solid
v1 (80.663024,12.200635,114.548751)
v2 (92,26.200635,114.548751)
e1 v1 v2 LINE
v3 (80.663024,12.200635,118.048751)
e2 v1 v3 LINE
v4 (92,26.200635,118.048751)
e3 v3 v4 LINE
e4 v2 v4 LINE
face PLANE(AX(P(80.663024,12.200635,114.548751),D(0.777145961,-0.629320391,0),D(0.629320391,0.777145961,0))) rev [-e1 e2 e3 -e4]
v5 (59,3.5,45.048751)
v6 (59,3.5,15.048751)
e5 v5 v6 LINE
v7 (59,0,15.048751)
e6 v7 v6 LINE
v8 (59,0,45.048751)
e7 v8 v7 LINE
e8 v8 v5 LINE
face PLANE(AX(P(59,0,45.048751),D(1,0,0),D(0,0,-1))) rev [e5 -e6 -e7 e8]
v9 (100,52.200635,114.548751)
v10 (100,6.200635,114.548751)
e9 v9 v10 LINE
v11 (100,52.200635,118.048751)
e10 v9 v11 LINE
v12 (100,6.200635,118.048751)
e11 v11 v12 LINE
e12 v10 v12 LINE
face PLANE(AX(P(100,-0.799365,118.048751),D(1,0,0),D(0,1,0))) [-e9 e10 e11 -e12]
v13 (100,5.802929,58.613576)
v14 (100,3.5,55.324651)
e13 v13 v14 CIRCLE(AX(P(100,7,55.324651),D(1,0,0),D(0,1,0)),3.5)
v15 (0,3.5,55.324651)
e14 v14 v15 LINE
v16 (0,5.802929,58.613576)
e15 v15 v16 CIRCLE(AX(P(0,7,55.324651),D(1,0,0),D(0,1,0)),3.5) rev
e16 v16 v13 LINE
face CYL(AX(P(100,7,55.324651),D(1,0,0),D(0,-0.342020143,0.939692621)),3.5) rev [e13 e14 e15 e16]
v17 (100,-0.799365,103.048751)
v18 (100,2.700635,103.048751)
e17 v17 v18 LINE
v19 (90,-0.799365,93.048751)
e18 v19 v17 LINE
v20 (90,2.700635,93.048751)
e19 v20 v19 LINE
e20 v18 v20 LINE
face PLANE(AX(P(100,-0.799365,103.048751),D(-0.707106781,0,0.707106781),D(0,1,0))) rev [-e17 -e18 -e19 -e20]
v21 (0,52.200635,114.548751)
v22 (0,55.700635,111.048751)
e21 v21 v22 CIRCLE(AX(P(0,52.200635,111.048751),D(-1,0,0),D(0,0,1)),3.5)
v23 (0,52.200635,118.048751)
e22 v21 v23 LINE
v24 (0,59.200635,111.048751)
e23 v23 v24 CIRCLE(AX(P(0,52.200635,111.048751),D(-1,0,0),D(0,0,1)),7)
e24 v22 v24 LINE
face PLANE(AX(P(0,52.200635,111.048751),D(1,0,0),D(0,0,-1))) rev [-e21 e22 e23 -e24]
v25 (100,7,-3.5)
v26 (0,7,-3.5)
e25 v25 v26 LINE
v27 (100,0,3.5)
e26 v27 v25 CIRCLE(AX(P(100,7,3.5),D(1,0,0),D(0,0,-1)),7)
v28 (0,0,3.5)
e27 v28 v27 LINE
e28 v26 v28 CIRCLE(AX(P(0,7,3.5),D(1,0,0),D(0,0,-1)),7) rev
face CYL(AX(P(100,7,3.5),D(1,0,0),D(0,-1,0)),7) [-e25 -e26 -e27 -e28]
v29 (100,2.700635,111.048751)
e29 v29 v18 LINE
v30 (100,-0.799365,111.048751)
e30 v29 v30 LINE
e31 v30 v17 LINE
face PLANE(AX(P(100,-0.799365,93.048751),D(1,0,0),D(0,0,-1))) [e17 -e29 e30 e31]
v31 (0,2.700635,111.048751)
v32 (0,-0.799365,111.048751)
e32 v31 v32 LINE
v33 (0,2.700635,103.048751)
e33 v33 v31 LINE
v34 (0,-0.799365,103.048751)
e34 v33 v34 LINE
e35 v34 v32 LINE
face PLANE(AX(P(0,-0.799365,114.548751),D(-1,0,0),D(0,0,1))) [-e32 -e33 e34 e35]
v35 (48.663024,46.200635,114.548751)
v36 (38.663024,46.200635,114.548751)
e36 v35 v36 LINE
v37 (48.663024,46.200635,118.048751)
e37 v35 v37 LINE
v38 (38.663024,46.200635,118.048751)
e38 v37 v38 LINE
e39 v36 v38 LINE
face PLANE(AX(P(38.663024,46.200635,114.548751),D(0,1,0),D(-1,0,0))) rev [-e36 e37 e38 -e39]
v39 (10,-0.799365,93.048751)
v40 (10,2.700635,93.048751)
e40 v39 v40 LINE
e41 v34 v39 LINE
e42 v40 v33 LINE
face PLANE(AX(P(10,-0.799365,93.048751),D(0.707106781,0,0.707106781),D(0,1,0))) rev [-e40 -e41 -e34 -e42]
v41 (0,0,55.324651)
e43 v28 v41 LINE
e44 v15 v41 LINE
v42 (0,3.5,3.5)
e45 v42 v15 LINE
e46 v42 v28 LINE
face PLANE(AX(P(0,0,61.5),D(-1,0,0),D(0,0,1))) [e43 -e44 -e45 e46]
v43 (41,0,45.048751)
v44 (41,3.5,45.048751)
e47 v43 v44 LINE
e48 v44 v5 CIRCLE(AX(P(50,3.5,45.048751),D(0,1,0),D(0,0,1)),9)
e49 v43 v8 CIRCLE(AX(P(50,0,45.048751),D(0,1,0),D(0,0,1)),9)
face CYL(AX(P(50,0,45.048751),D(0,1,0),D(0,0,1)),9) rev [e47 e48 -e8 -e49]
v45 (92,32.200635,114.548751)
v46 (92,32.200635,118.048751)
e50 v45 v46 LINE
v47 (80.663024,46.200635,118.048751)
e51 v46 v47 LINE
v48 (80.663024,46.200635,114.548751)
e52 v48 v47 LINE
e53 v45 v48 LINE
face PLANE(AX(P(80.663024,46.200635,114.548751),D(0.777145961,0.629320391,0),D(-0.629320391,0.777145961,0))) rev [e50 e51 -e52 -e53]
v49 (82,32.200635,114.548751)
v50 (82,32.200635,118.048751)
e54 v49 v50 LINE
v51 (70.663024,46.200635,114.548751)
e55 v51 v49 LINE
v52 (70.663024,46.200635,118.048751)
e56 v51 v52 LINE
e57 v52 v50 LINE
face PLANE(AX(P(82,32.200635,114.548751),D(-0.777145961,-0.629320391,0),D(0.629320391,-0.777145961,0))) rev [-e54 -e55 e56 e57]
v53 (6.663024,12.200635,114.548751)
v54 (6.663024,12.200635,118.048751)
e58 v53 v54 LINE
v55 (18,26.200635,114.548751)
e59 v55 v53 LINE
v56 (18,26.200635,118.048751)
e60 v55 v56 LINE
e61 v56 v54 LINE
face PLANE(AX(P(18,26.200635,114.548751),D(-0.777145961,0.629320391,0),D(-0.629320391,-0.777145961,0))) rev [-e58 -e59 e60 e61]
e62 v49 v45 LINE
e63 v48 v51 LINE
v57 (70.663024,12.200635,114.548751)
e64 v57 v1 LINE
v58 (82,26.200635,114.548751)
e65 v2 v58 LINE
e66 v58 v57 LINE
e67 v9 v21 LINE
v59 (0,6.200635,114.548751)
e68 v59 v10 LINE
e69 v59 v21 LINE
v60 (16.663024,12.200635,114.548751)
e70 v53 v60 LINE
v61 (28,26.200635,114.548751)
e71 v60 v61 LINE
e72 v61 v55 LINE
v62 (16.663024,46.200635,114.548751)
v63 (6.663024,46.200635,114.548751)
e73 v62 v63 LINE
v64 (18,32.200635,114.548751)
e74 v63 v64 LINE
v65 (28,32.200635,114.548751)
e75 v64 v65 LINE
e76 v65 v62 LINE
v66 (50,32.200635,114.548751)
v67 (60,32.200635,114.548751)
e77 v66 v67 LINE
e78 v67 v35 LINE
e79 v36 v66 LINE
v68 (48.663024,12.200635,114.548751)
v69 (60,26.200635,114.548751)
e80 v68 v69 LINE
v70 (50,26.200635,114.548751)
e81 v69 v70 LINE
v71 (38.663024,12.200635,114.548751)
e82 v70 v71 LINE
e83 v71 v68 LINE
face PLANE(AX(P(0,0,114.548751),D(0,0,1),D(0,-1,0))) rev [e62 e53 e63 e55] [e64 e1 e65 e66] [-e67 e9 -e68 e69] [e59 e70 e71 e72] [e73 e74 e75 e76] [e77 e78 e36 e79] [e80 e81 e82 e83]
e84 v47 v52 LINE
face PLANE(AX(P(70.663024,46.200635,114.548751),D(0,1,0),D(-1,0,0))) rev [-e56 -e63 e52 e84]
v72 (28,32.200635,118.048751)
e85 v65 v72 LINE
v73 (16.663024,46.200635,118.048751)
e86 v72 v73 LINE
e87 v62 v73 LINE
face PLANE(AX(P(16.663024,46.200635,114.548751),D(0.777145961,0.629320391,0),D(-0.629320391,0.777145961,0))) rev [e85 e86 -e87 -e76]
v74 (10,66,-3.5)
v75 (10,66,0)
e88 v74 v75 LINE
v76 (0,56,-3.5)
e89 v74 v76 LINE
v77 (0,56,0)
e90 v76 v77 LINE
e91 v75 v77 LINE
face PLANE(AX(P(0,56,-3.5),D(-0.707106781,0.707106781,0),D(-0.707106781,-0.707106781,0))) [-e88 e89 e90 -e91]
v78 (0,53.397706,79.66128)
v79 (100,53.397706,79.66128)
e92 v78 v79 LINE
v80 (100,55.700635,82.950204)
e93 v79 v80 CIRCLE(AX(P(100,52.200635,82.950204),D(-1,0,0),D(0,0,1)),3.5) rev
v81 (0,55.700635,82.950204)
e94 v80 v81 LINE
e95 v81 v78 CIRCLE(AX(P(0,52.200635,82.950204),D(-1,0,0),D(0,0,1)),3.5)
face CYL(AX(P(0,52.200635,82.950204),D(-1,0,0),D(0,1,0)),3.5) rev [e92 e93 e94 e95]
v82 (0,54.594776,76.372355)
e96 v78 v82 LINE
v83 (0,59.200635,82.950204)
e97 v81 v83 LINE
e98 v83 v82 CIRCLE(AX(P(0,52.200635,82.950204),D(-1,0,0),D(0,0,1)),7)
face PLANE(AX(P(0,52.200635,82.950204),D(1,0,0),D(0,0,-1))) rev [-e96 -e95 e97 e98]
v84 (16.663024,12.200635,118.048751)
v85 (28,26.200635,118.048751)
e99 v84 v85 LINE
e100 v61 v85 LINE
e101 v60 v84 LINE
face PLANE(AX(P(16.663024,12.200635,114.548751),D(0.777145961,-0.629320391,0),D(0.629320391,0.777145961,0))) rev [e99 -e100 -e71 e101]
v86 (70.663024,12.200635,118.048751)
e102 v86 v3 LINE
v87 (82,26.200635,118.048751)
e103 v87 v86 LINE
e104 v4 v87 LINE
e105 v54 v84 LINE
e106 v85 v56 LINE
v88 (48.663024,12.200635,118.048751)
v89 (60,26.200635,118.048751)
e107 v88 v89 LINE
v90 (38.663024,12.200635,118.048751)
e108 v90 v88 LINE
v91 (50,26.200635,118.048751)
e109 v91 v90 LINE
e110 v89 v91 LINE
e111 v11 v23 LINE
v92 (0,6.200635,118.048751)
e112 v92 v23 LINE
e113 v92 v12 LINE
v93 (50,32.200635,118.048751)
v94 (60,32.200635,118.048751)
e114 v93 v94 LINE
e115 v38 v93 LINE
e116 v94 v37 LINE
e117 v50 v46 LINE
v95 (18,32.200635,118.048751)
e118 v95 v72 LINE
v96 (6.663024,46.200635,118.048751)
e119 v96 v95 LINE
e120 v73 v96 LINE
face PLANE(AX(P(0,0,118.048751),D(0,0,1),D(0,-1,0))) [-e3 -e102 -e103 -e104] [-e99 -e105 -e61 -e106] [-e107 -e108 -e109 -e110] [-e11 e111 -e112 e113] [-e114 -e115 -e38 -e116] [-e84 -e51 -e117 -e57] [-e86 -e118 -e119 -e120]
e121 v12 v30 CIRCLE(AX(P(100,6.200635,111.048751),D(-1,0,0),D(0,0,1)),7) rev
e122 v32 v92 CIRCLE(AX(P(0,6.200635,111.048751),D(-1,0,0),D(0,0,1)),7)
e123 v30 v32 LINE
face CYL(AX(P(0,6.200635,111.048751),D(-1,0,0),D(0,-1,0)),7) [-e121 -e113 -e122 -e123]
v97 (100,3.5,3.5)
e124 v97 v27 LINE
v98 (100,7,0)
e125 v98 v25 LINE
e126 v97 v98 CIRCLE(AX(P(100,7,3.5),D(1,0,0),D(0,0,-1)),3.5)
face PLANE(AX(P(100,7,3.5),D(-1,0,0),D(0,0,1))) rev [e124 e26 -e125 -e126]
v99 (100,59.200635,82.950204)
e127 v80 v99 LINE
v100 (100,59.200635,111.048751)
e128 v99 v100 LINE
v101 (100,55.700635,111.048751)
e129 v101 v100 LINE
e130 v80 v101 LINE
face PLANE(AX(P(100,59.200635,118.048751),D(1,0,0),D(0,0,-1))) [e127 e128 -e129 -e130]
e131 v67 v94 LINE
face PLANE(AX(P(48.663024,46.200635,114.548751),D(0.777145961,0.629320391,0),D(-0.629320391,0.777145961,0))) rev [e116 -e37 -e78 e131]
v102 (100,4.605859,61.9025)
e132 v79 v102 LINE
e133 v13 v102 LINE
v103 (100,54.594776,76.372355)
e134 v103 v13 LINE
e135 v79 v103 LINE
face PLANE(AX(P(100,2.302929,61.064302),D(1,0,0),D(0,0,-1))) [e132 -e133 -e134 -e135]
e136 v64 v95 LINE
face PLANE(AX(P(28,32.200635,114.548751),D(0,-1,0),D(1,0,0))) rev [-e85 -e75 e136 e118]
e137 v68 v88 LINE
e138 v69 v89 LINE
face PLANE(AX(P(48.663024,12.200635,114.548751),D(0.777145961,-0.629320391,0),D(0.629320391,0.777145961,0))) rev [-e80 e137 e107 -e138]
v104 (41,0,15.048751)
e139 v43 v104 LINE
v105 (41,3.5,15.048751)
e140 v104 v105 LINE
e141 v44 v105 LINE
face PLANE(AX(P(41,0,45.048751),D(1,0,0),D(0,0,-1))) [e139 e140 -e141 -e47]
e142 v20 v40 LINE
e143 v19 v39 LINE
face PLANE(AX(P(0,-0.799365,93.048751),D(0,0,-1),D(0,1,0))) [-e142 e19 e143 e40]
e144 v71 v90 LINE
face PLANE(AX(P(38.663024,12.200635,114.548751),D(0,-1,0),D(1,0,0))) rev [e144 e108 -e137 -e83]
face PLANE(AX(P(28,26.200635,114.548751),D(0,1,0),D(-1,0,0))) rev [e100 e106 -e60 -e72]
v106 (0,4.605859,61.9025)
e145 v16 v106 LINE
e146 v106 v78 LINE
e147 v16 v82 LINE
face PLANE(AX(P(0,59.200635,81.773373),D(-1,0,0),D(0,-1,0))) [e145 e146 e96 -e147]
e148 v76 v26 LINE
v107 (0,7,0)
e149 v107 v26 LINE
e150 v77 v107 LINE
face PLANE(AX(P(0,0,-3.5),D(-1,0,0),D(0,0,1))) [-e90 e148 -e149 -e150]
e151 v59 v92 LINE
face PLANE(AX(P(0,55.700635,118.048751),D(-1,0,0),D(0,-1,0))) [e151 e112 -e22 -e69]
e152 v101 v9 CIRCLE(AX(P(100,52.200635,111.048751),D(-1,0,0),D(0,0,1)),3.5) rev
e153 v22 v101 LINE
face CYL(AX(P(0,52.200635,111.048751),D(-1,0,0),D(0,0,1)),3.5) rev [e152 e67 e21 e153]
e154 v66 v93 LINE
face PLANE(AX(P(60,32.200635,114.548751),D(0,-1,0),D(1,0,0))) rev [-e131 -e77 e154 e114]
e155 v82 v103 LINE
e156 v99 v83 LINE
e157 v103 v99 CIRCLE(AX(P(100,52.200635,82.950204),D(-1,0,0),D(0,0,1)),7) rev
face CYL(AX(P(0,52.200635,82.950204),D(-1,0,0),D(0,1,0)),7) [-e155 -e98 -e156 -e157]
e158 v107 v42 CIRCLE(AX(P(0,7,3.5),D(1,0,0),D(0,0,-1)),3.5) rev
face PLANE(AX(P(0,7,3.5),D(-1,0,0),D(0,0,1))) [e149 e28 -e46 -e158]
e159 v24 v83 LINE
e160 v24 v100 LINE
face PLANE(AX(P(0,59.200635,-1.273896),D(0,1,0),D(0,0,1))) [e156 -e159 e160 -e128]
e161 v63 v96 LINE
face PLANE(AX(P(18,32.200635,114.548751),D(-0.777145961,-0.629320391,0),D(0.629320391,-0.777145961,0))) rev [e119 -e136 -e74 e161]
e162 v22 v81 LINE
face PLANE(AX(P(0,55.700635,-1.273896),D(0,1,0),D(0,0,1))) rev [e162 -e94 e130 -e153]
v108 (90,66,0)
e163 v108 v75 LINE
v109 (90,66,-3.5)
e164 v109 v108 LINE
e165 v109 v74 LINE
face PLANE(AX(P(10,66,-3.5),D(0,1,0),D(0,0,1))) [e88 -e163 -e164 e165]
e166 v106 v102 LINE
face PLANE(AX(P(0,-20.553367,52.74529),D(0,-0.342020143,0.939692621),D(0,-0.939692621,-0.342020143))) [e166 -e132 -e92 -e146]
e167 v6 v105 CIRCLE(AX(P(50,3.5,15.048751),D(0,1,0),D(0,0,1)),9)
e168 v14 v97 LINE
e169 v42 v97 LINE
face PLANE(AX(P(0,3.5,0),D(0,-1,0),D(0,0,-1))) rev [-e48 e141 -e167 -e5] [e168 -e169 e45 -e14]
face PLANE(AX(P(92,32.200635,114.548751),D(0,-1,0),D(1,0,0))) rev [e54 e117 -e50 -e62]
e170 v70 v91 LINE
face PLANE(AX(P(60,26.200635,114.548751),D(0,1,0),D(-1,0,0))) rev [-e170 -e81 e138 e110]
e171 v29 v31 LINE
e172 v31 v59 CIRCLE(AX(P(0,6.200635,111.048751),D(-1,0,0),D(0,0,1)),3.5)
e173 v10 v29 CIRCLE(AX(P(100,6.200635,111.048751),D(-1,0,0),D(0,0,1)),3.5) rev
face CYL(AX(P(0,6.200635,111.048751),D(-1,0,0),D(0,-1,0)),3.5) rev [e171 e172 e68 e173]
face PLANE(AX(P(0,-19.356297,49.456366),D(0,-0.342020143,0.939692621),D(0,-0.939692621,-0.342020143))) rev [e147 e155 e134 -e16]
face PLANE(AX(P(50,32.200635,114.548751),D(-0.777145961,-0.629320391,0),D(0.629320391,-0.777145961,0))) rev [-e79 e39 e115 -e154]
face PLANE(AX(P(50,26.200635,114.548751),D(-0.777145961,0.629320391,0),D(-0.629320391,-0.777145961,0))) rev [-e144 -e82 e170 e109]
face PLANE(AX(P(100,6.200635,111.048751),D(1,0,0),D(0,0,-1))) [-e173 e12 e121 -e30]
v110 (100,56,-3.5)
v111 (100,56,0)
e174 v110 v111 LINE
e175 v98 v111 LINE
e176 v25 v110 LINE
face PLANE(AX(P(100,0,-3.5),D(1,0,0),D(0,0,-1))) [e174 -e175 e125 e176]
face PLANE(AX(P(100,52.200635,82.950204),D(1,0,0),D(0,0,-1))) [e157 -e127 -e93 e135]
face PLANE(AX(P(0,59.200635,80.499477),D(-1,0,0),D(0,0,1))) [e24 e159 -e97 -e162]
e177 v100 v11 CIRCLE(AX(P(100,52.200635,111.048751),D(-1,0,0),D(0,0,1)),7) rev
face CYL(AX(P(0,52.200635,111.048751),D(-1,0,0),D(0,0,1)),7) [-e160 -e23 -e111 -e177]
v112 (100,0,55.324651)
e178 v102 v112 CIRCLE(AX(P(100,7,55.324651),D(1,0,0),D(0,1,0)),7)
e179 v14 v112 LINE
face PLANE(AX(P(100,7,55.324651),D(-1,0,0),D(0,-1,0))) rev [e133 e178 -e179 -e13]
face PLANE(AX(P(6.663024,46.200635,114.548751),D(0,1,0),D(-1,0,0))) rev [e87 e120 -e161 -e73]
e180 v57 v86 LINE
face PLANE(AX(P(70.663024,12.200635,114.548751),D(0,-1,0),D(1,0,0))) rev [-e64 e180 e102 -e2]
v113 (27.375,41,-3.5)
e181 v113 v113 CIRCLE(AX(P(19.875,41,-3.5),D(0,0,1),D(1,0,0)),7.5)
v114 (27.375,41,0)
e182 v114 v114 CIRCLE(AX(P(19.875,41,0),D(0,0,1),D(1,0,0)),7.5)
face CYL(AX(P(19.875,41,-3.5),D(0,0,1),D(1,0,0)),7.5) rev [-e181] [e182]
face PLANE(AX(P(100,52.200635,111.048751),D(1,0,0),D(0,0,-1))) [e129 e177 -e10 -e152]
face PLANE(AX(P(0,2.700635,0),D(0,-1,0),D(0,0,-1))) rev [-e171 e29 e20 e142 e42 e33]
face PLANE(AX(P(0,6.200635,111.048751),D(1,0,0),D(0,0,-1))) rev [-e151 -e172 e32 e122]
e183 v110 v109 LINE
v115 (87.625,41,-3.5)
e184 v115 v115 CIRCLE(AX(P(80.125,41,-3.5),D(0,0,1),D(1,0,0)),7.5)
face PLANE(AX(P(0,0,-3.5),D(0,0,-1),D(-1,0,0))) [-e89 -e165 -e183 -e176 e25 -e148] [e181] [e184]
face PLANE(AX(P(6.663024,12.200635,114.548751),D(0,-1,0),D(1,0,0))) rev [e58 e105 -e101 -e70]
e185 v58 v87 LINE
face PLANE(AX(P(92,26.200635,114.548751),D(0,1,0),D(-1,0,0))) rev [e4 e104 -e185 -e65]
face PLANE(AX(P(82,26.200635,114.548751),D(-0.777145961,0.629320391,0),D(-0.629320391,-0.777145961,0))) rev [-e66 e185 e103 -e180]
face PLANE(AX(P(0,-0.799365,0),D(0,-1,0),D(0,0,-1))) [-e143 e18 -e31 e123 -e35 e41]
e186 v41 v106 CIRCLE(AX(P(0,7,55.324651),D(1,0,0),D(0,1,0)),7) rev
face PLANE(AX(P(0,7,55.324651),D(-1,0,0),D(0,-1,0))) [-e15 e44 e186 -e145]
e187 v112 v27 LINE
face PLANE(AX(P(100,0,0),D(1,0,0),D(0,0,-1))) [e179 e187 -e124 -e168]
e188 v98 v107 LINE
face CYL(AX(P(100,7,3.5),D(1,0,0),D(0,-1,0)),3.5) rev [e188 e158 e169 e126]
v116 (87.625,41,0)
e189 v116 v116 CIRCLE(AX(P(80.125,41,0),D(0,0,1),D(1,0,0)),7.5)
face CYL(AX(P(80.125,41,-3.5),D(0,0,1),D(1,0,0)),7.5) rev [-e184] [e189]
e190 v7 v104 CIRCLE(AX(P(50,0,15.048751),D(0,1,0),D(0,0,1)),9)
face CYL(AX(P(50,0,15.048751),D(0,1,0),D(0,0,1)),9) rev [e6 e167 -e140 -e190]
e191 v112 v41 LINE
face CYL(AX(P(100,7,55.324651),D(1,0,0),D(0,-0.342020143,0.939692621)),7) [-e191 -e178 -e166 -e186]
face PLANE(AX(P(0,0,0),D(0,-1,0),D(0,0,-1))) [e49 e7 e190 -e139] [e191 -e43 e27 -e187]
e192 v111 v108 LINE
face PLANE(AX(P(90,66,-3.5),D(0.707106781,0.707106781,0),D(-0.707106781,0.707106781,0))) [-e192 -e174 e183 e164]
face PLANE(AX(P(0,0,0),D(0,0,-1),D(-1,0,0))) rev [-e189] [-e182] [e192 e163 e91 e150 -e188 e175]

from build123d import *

# Parameters (mm, degrees)
SKETCH1_R                    = 7.5
BASE_FLANGE1_DEPTH           = 3.5
EDGE_FLANGE1_STRIP_W         = 21
EDGE_FLANGE1_STRIP_H         = 3.5
EDGE_FLANGE1_STRIP_CUT_DEPTH = 100
EDGE_FLANGE1_DEPTH           = 100
EDGE_FLANGE2_DEPTH           = 100
EDGE_FLANGE2_2_DEPTH         = 100
EDGE_FLANGE3_DEPTH           = 100
EDGE_FLANGE3_2_DEPTH         = 100
EDGE_FLANGE4_STRIP_W         = 21
EDGE_FLANGE4_STRIP_H         = 3.5
EDGE_FLANGE4_STRIP_CUT_DEPTH = 100
EDGE_FLANGE4_DEPTH           = 100
EDGE_FLANGE5_STRIP_W         = 21
EDGE_FLANGE5_STRIP_H         = 3.5
EDGE_FLANGE5_STRIP_CUT_DEPTH = 100
EDGE_FLANGE5_DEPTH           = 100
BREAK_CORNER1_START          = -0.79936489
BREAK_CORNER1_DEPTH          = 3.5
CUT_EXTRUDE1_DEPTH           = 10
CUT_EXTRUDE2_DEPTH           = 10


# Read off the part's stored shape, not the designer's step: Edge-Flange2, Edge-Flange3, Break-Corner1
# Sheet-metal steps are written as plain solids
with BuildPart() as part:
    # Sketch1 → Base-Flange1 (new body)
    with BuildSketch(Plane.XY):
        Polygon((90, 66), (100, 56), (100, 0), (0, 0), (0, 56), (10, 66), align=None)
        with Locations((19.875, 41)):
            Circle(SKETCH1_R, mode=Mode.SUBTRACT)
        with Locations((80.125, 41)):
            Circle(SKETCH1_R, mode=Mode.SUBTRACT)
    extrude(amount=-BASE_FLANGE1_DEPTH)

    # Edge-Flange1 strip (across the edge) → Edge-Flange1 strip cut (cut)
    with BuildSketch(Plane.YZ):
        with Locations((-3.5, -1.75)):
            Rectangle(EDGE_FLANGE1_STRIP_W, EDGE_FLANGE1_STRIP_H)
    extrude(amount=EDGE_FLANGE1_STRIP_CUT_DEPTH, mode=Mode.SUBTRACT)

    # Edge-Flange1 section (across the edge) → Edge-Flange1 (add)
    with BuildSketch(Plane.YZ):
        with BuildLine():
            Line((0, 3.5), (0, 61.5))
            Line((0, 61.5), (3.5, 61.5))
            Line((3.5, 61.5), (3.5, 3.5))
            ThreePointArc((3.5, 3.5), (4.525126266, 1.025126266), (7, 0))
            Line((7, 0), (7, -3.5))
            ThreePointArc((7, -3.5), (2.050252532, -1.449747468), (0, 3.5))
        make_face()
    extrude(amount=EDGE_FLANGE1_DEPTH)

    # Edge-Flange2 outline → Edge-Flange2 (cut)
    with BuildSketch(Plane.YZ):
        with BuildLine():
            ThreePointArc((0, 55.324651413), (0.937822174, 58.824651413), (3.5, 61.386829239))
            Line((3.5, 61.386829239), (3.5, 61.5))
            Line((3.5, 61.5), (0, 61.5))
            Line((0, 61.5), (0, 55.324651413))
        make_face()
    extrude(amount=EDGE_FLANGE2_DEPTH, mode=Mode.SUBTRACT)

    # Edge-Flange2 2 outline → Edge-Flange2 2 (add)
    with BuildSketch(Plane.YZ):
        with BuildLine():
            Line((59.20063511, 81.77337321), (4.605858997, 61.902499758))
            ThreePointArc((4.605858997, 61.902499758), (4.041672168, 61.668805922), (3.5, 61.386829239))
            Line((3.5, 61.386829239), (3.5, 55.324651413))
            ThreePointArc((3.5, 55.324651413), (4.132967845, 57.33216894), (5.802929498, 58.613575585))
            Line((5.802929498, 58.613575585), (60.397705611, 78.484449037))
            Line((60.397705611, 78.484449037), (59.20063511, 81.77337321))
        make_face()
    extrude(amount=EDGE_FLANGE2_2_DEPTH)

    # Edge-Flange3 outline → Edge-Flange3 (cut)
    with BuildSketch(Plane.YZ):
        with BuildLine():
            Line((59.20063511, 81.77337321), (59.094289381, 81.73466653))
            ThreePointArc((59.094289381, 81.73466653), (57.562946212, 78.450690506), (54.594776113, 76.372355428))
            Line((54.594776113, 76.372355428), (60.397705611, 78.484449037))
            Line((60.397705611, 78.484449037), (59.20063511, 81.77337321))
        make_face()
    extrude(amount=EDGE_FLANGE3_DEPTH, mode=Mode.SUBTRACT)

    # Edge-Flange3 2 outline → Edge-Flange3 2 (add)
    with BuildSketch(Plane.YZ):
        with BuildLine():
            ThreePointArc((59.094289381, 81.73466653), (59.173997997, 82.340113574), (59.20063511, 82.950203773))
            Line((59.20063511, 82.950203773), (59.20063511, 118.048751006))
            Line((59.20063511, 118.048751006), (55.70063511, 118.048751006))
            Line((55.70063511, 118.048751006), (55.70063511, 82.950203773))
            ThreePointArc((55.70063511, 82.950203773), (55.067667265, 80.942686246), (53.397705611, 79.661279601))
            Line((53.397705611, 79.661279601), (59.094289381, 81.73466653))
        make_face()
    extrude(amount=EDGE_FLANGE3_2_DEPTH)

    # Edge-Flange4 strip (across the edge) → Edge-Flange4 strip cut (cut)
    with BuildSketch(Plane(origin=(100, 55.70063511, 118.048751006), x_dir=(0, 0, -1), z_dir=(-1, 0, 0))):
        with Locations((-3.5, -1.75)):
            Rectangle(EDGE_FLANGE4_STRIP_W, EDGE_FLANGE4_STRIP_H)
    extrude(amount=EDGE_FLANGE4_STRIP_CUT_DEPTH, mode=Mode.SUBTRACT)

    # Edge-Flange4 section (across the edge) → Edge-Flange4 (add)
    with BuildSketch(Plane(origin=(100, 55.70063511, 118.048751006), x_dir=(0, 0, -1), z_dir=(-1, 0, 0))):
        with BuildLine():
            Line((0, 3.5), (0, 56.5))
            Line((0, 56.5), (3.5, 56.5))
            Line((3.5, 56.5), (3.5, 3.5))
            ThreePointArc((3.5, 3.5), (4.525126266, 1.025126266), (7, 0))
            Line((7, 0), (7, -3.5))
            ThreePointArc((7, -3.5), (2.050252532, -1.449747468), (0, 3.5))
        make_face()
    extrude(amount=EDGE_FLANGE4_DEPTH)

    # Edge-Flange5 strip (across the edge) → Edge-Flange5 strip cut (cut)
    with BuildSketch(Plane(origin=(100, -0.79936489, 114.548751006), x_dir=(0, 1, 0), z_dir=(-1, 0, 0))):
        with Locations((-3.5, -1.75)):
            Rectangle(EDGE_FLANGE5_STRIP_W, EDGE_FLANGE5_STRIP_H)
    extrude(amount=EDGE_FLANGE5_STRIP_CUT_DEPTH, mode=Mode.SUBTRACT)

    # Edge-Flange5 section (across the edge) → Edge-Flange5 (add)
    with BuildSketch(Plane(origin=(100, -0.79936489, 114.548751006), x_dir=(0, 1, 0), z_dir=(-1, 0, 0))):
        with BuildLine():
            Line((0, 3.5), (0, 21.5))
            Line((0, 21.5), (3.5, 21.5))
            Line((3.5, 21.5), (3.5, 3.5))
            ThreePointArc((3.5, 3.5), (4.525126266, 1.025126266), (7, 0))
            Line((7, 0), (7, -3.5))
            ThreePointArc((7, -3.5), (2.050252532, -1.449747468), (0, 3.5))
        make_face()
    extrude(amount=EDGE_FLANGE5_DEPTH)

    # Break-Corner1 outline → Break-Corner1 (cut)
    with BuildSketch(Plane(origin=(0, 0, 0), x_dir=(1, 0, 0), z_dir=(0, 1, 0)).offset(BREAK_CORNER1_START)):
        Polygon((100, -93.048751006), (90, -93.048751006), (100, -103.048751006), align=None)
        Polygon((0, -103.048751006), (10, -93.048751006), (0, -93.048751006), align=None)
    extrude(amount=BREAK_CORNER1_DEPTH, mode=Mode.SUBTRACT)

    # Sketch24 → Cut-Extrude1 (cut)
    with BuildSketch(Plane.XY.offset(118.048751006)):
        Polygon((70.663023535, 46.20063511), (80.663023535, 46.20063511), (92, 32.20063511), (82, 32.20063511), align=None)
        Polygon((38.663023535, 46.20063511), (48.663023535, 46.20063511), (60, 32.20063511), (50, 32.20063511), align=None)
        Polygon((6.663023535, 46.20063511), (16.663023535, 46.20063511), (28, 32.20063511), (18, 32.20063511), align=None)
        Polygon((18, 26.20063511), (6.663023535, 12.20063511), (16.663023535, 12.20063511), (28, 26.20063511), align=None)
        Polygon((50, 26.20063511), (38.663023535, 12.20063511), (48.663023535, 12.20063511), (60, 26.20063511), align=None)
        Polygon((82, 26.20063511), (70.663023535, 12.20063511), (80.663023535, 12.20063511), (92, 26.20063511), align=None)
    extrude(amount=-CUT_EXTRUDE1_DEPTH, mode=Mode.SUBTRACT)

    # Sketch25 → Cut-Extrude2 (cut)
    with BuildSketch(Plane(origin=(0, 3.5, 0), x_dir=(1, 0, 0), z_dir=(0, 1, 0))):
        with BuildLine():
            Line((41, -45.048751006), (41, -15.048751006))
            ThreePointArc((41, -15.048751006), (50, -6.048751006), (59, -15.048751006))
            Line((59, -15.048751006), (59, -45.048751006))
            ThreePointArc((59, -45.048751006), (50, -54.048751006), (41, -45.048751006))
        make_face()
    extrude(amount=-CUT_EXTRUDE2_DEPTH, mode=Mode.SUBTRACT)


solid = part.part
